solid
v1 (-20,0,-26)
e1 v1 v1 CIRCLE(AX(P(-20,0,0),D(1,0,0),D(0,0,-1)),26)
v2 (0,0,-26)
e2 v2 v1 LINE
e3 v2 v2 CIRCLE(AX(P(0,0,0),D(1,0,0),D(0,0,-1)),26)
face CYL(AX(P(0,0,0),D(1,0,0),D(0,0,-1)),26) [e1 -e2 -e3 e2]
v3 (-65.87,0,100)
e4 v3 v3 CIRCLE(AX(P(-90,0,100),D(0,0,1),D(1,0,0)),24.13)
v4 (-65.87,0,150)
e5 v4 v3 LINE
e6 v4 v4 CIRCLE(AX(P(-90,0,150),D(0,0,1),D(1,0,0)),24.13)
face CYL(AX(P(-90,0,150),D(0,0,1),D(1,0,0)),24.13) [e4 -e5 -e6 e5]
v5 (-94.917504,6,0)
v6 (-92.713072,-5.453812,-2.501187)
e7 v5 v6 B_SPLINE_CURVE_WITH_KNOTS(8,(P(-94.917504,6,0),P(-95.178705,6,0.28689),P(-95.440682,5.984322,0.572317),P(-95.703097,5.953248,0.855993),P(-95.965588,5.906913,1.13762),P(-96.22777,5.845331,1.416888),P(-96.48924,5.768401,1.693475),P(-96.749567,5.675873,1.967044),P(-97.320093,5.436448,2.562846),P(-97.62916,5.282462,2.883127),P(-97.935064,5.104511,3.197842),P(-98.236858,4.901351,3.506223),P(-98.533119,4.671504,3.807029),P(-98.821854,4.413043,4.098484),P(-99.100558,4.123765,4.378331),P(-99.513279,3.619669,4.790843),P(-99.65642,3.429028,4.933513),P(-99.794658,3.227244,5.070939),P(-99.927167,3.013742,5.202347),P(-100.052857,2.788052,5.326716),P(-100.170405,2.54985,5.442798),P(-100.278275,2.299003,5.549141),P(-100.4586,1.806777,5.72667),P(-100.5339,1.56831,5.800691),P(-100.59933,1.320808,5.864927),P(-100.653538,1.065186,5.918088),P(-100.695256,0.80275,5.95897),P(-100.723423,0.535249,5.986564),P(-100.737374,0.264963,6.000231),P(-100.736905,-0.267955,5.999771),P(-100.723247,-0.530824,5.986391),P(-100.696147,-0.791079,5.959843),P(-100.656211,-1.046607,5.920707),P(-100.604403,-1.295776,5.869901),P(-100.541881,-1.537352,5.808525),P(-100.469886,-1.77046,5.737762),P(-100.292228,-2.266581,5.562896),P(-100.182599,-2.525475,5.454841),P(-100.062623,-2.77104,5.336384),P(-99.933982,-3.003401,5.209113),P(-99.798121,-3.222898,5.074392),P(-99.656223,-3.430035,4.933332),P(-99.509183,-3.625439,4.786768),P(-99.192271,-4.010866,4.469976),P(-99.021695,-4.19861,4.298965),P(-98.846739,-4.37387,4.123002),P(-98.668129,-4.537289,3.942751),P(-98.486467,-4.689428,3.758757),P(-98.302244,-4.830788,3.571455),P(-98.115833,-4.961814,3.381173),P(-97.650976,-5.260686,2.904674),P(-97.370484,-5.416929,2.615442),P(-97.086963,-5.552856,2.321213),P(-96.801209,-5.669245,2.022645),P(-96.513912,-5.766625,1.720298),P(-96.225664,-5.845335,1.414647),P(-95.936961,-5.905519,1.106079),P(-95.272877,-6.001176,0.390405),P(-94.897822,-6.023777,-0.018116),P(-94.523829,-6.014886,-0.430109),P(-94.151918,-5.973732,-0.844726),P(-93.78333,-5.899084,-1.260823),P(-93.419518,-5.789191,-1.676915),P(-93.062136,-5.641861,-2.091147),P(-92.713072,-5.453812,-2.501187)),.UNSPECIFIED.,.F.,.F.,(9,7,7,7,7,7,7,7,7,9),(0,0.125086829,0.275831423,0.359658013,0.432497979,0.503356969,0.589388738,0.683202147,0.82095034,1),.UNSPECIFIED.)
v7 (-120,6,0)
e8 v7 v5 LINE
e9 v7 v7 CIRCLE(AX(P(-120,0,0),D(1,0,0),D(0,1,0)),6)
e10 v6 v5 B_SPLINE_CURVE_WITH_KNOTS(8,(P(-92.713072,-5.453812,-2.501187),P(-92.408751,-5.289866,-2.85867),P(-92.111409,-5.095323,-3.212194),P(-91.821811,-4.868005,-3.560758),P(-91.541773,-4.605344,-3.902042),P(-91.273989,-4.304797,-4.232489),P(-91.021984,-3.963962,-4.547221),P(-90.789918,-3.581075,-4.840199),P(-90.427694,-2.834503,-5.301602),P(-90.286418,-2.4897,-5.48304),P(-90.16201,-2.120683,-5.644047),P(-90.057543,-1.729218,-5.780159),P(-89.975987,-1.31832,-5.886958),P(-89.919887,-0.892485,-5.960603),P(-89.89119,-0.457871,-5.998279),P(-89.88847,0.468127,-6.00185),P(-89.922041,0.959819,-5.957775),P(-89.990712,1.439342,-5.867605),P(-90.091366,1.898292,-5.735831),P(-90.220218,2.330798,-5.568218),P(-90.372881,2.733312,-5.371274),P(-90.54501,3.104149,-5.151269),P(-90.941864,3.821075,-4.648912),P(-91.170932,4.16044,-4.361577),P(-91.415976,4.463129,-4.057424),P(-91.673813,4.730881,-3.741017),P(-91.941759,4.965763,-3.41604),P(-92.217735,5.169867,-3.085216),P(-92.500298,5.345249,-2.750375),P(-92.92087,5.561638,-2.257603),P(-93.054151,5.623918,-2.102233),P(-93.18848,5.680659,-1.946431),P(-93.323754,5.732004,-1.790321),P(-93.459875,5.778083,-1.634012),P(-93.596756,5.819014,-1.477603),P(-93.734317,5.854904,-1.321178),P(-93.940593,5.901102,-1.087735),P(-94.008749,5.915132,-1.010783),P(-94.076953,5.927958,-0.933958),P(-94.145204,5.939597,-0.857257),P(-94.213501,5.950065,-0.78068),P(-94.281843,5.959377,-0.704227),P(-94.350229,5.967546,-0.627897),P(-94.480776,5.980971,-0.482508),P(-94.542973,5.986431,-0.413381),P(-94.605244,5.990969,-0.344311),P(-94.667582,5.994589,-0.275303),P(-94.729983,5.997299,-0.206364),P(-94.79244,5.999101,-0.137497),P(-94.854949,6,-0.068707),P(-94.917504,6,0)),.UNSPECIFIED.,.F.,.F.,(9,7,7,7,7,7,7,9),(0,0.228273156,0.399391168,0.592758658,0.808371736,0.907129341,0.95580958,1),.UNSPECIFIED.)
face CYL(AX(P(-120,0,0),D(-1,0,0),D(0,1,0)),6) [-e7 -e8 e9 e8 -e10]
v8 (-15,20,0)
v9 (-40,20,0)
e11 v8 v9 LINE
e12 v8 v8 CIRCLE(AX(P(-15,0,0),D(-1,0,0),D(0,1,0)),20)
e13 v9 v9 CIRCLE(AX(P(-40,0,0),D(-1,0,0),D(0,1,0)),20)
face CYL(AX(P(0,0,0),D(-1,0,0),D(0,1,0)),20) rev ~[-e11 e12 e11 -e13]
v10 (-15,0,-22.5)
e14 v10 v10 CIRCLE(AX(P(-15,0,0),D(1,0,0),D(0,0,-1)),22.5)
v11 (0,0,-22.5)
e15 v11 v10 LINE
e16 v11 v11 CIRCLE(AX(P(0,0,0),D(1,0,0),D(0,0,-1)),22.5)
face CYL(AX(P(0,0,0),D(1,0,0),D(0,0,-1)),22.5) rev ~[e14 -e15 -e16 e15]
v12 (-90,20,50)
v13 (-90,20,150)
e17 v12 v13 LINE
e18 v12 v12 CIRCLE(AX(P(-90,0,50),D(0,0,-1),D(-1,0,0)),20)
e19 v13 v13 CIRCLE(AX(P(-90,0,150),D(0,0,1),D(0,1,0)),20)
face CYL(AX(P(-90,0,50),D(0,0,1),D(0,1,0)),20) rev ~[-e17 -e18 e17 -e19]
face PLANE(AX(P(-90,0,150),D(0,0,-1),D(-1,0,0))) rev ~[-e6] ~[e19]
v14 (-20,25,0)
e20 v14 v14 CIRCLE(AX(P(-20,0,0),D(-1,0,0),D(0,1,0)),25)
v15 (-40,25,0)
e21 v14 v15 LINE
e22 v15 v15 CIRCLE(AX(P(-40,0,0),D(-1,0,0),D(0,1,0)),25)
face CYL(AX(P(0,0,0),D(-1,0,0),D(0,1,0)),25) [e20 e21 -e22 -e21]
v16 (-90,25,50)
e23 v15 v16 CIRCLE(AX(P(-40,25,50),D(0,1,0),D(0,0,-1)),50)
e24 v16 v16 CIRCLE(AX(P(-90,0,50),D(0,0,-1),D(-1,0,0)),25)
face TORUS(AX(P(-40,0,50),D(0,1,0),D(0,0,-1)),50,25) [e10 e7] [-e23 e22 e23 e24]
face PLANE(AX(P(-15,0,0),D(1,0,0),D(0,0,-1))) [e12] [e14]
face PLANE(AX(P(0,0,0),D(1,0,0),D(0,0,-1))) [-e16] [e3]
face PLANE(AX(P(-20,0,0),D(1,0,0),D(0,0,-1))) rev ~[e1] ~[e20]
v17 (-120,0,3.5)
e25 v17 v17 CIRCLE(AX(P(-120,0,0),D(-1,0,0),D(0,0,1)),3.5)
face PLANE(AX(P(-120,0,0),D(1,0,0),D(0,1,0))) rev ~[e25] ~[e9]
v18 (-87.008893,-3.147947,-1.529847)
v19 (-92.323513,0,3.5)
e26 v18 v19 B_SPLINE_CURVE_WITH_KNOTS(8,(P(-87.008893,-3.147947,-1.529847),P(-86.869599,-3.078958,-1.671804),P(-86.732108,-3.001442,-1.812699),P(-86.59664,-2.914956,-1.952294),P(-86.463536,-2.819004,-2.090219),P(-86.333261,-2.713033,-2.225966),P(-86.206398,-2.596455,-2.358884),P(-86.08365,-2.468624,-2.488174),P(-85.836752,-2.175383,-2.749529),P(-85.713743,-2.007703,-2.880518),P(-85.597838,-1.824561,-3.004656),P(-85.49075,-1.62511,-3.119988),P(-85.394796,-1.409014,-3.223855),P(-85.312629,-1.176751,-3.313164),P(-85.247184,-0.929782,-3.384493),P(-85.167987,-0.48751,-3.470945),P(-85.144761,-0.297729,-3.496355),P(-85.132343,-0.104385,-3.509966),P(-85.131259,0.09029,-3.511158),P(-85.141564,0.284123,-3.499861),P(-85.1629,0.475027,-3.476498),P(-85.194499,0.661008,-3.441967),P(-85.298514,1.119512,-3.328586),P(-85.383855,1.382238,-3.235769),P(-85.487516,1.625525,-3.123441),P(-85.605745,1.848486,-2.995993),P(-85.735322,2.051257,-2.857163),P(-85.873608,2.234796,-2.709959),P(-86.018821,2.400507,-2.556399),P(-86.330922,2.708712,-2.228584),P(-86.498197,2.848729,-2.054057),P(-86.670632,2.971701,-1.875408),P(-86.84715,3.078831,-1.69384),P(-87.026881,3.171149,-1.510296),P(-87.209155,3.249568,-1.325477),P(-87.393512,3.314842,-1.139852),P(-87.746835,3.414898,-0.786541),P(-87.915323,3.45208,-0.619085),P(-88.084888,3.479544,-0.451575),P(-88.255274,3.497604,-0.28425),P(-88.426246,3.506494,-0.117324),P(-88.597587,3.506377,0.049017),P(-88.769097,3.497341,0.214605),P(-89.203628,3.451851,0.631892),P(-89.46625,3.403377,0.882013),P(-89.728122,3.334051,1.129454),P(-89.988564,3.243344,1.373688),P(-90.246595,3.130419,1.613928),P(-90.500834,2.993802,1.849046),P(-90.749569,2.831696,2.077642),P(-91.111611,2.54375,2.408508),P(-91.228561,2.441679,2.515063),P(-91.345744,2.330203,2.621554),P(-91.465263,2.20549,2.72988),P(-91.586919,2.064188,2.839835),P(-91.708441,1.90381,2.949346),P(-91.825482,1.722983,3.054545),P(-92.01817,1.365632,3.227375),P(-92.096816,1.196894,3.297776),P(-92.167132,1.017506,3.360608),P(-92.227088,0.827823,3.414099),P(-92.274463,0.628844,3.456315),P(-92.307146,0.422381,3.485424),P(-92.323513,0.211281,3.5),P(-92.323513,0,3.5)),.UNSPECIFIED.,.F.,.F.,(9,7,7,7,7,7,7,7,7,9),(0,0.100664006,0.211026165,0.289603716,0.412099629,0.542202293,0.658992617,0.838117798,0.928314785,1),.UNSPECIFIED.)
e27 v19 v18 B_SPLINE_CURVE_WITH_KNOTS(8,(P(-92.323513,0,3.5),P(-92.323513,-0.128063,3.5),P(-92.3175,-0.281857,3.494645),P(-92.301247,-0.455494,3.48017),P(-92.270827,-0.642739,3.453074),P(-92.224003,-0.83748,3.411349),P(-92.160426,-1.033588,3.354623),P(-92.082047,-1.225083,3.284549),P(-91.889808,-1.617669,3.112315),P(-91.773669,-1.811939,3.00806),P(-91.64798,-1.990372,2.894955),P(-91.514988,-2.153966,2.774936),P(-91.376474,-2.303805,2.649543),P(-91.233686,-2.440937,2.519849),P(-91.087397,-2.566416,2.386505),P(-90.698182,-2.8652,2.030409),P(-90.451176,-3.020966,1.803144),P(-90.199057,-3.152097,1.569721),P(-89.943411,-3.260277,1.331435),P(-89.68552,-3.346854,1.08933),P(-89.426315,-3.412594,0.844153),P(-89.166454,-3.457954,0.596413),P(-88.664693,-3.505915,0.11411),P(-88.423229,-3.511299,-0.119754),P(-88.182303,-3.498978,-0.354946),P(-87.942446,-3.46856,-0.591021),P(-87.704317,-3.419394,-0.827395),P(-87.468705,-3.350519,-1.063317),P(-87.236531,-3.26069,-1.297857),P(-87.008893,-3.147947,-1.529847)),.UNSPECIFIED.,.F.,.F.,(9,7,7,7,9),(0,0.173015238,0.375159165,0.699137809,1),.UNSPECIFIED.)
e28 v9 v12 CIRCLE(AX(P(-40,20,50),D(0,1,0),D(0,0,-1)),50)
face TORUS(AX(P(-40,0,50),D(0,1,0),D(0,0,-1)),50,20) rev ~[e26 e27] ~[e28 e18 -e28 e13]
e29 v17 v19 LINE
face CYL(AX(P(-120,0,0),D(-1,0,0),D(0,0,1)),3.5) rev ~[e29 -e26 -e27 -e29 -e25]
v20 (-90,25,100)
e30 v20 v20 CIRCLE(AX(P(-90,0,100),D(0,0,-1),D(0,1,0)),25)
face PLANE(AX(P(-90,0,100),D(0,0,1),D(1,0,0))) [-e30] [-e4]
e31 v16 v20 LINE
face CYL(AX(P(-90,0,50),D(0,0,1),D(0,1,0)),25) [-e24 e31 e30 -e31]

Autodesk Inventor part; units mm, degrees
ref_plane "XZ Plane" through (0, 0, 0) normal (0, 1, 0) x (-1, 0, 0)
ref_plane "XY Plane" through (0, 0, 0) normal (0, 0, 1) x (1, 0, 0)
sketch "Sketch1" plane through (0, 0, 0) normal (0, 1, 0) x (-1, 0, 0)
  line L0 (0, 0) -> (40, 0)
  line L1 (90, 50) -> (90, 150)
  arc A0 (40, 0) -> (90, 50) centre (40, 50) ccw
  point P0 (90, 0)
  dimension "d0" = 90
  dimension "d1" = 150
  dimension "d2" = 50
sketch "Sketch2" plane through (0, 0, 0) normal (1, 0, 0) x (0, 1, 0)
  circle A0 centre (0, 0) radius 25
  dimension "d3" = 50
sweep "Sweep1" add profiles "Sketch2" path "Sketch1"
shell "Shell1" thickness 5 removed faces 2 at (0, -6.2376, 1.5374) at (-91.9943, -6.0822, 150)
sketch "Sketch3" plane through (0, 0, 0) normal (1, 0, 0) x (0, 0, -1)
  circle A0 centre (0, 0) radius 26
  circle A1 centre (0, 0) radius 25 projected
  dimension "d7" = 52
extrude "Extrusion1" add sketch "Sketch3" against normal blind 20
sketch "Sketch5" plane through (-90, 0, 150) normal (0, 0, 1) x (1, 0, 0)
  circle A0 centre (0, 0) radius 24.13
  circle A1 centre (0, 0) radius 25 projected
  point P0 (90, 0)
  dimension "d11" = 48.26
extrude "Extrusion2" cut sketch "Sketch5" against normal blind 50
ref_plane "Work Plane1" through (-120, 0, 0) normal (1, 0, 0) x (0, 1, 0)
sketch "Sketch6" plane through (-120, 0, 0) normal (1, 0, 0) x (0, 1, 0)
  circle A0 centre (0, 0) radius 6
  dimension "d15" = 12
extrude "Extrusion3" add sketch "Sketch6" along normal up to surface
sketch "Sketch8" plane through (-120, 0, 0) normal (-1, 0, 0) x (0, 0, 1)
  circle A0 centre (0, 0) radius 3.5
  dimension "d22" = 7
extrude "Extrusion4" cut sketch "Sketch8" against normal through all
sketch "Sketch9" plane through (0, 0, 0) normal (1, 0, 0) x (0, 0, -1)
  circle A0 centre (0, 0) radius 22.5
  circle A1 centre (0, 0) radius 20 projected
  dimension "d25" = 45
extrude "Extrusion5" cut sketch "Sketch9" against normal blind 15
properties part number "FEE-PIPE"
